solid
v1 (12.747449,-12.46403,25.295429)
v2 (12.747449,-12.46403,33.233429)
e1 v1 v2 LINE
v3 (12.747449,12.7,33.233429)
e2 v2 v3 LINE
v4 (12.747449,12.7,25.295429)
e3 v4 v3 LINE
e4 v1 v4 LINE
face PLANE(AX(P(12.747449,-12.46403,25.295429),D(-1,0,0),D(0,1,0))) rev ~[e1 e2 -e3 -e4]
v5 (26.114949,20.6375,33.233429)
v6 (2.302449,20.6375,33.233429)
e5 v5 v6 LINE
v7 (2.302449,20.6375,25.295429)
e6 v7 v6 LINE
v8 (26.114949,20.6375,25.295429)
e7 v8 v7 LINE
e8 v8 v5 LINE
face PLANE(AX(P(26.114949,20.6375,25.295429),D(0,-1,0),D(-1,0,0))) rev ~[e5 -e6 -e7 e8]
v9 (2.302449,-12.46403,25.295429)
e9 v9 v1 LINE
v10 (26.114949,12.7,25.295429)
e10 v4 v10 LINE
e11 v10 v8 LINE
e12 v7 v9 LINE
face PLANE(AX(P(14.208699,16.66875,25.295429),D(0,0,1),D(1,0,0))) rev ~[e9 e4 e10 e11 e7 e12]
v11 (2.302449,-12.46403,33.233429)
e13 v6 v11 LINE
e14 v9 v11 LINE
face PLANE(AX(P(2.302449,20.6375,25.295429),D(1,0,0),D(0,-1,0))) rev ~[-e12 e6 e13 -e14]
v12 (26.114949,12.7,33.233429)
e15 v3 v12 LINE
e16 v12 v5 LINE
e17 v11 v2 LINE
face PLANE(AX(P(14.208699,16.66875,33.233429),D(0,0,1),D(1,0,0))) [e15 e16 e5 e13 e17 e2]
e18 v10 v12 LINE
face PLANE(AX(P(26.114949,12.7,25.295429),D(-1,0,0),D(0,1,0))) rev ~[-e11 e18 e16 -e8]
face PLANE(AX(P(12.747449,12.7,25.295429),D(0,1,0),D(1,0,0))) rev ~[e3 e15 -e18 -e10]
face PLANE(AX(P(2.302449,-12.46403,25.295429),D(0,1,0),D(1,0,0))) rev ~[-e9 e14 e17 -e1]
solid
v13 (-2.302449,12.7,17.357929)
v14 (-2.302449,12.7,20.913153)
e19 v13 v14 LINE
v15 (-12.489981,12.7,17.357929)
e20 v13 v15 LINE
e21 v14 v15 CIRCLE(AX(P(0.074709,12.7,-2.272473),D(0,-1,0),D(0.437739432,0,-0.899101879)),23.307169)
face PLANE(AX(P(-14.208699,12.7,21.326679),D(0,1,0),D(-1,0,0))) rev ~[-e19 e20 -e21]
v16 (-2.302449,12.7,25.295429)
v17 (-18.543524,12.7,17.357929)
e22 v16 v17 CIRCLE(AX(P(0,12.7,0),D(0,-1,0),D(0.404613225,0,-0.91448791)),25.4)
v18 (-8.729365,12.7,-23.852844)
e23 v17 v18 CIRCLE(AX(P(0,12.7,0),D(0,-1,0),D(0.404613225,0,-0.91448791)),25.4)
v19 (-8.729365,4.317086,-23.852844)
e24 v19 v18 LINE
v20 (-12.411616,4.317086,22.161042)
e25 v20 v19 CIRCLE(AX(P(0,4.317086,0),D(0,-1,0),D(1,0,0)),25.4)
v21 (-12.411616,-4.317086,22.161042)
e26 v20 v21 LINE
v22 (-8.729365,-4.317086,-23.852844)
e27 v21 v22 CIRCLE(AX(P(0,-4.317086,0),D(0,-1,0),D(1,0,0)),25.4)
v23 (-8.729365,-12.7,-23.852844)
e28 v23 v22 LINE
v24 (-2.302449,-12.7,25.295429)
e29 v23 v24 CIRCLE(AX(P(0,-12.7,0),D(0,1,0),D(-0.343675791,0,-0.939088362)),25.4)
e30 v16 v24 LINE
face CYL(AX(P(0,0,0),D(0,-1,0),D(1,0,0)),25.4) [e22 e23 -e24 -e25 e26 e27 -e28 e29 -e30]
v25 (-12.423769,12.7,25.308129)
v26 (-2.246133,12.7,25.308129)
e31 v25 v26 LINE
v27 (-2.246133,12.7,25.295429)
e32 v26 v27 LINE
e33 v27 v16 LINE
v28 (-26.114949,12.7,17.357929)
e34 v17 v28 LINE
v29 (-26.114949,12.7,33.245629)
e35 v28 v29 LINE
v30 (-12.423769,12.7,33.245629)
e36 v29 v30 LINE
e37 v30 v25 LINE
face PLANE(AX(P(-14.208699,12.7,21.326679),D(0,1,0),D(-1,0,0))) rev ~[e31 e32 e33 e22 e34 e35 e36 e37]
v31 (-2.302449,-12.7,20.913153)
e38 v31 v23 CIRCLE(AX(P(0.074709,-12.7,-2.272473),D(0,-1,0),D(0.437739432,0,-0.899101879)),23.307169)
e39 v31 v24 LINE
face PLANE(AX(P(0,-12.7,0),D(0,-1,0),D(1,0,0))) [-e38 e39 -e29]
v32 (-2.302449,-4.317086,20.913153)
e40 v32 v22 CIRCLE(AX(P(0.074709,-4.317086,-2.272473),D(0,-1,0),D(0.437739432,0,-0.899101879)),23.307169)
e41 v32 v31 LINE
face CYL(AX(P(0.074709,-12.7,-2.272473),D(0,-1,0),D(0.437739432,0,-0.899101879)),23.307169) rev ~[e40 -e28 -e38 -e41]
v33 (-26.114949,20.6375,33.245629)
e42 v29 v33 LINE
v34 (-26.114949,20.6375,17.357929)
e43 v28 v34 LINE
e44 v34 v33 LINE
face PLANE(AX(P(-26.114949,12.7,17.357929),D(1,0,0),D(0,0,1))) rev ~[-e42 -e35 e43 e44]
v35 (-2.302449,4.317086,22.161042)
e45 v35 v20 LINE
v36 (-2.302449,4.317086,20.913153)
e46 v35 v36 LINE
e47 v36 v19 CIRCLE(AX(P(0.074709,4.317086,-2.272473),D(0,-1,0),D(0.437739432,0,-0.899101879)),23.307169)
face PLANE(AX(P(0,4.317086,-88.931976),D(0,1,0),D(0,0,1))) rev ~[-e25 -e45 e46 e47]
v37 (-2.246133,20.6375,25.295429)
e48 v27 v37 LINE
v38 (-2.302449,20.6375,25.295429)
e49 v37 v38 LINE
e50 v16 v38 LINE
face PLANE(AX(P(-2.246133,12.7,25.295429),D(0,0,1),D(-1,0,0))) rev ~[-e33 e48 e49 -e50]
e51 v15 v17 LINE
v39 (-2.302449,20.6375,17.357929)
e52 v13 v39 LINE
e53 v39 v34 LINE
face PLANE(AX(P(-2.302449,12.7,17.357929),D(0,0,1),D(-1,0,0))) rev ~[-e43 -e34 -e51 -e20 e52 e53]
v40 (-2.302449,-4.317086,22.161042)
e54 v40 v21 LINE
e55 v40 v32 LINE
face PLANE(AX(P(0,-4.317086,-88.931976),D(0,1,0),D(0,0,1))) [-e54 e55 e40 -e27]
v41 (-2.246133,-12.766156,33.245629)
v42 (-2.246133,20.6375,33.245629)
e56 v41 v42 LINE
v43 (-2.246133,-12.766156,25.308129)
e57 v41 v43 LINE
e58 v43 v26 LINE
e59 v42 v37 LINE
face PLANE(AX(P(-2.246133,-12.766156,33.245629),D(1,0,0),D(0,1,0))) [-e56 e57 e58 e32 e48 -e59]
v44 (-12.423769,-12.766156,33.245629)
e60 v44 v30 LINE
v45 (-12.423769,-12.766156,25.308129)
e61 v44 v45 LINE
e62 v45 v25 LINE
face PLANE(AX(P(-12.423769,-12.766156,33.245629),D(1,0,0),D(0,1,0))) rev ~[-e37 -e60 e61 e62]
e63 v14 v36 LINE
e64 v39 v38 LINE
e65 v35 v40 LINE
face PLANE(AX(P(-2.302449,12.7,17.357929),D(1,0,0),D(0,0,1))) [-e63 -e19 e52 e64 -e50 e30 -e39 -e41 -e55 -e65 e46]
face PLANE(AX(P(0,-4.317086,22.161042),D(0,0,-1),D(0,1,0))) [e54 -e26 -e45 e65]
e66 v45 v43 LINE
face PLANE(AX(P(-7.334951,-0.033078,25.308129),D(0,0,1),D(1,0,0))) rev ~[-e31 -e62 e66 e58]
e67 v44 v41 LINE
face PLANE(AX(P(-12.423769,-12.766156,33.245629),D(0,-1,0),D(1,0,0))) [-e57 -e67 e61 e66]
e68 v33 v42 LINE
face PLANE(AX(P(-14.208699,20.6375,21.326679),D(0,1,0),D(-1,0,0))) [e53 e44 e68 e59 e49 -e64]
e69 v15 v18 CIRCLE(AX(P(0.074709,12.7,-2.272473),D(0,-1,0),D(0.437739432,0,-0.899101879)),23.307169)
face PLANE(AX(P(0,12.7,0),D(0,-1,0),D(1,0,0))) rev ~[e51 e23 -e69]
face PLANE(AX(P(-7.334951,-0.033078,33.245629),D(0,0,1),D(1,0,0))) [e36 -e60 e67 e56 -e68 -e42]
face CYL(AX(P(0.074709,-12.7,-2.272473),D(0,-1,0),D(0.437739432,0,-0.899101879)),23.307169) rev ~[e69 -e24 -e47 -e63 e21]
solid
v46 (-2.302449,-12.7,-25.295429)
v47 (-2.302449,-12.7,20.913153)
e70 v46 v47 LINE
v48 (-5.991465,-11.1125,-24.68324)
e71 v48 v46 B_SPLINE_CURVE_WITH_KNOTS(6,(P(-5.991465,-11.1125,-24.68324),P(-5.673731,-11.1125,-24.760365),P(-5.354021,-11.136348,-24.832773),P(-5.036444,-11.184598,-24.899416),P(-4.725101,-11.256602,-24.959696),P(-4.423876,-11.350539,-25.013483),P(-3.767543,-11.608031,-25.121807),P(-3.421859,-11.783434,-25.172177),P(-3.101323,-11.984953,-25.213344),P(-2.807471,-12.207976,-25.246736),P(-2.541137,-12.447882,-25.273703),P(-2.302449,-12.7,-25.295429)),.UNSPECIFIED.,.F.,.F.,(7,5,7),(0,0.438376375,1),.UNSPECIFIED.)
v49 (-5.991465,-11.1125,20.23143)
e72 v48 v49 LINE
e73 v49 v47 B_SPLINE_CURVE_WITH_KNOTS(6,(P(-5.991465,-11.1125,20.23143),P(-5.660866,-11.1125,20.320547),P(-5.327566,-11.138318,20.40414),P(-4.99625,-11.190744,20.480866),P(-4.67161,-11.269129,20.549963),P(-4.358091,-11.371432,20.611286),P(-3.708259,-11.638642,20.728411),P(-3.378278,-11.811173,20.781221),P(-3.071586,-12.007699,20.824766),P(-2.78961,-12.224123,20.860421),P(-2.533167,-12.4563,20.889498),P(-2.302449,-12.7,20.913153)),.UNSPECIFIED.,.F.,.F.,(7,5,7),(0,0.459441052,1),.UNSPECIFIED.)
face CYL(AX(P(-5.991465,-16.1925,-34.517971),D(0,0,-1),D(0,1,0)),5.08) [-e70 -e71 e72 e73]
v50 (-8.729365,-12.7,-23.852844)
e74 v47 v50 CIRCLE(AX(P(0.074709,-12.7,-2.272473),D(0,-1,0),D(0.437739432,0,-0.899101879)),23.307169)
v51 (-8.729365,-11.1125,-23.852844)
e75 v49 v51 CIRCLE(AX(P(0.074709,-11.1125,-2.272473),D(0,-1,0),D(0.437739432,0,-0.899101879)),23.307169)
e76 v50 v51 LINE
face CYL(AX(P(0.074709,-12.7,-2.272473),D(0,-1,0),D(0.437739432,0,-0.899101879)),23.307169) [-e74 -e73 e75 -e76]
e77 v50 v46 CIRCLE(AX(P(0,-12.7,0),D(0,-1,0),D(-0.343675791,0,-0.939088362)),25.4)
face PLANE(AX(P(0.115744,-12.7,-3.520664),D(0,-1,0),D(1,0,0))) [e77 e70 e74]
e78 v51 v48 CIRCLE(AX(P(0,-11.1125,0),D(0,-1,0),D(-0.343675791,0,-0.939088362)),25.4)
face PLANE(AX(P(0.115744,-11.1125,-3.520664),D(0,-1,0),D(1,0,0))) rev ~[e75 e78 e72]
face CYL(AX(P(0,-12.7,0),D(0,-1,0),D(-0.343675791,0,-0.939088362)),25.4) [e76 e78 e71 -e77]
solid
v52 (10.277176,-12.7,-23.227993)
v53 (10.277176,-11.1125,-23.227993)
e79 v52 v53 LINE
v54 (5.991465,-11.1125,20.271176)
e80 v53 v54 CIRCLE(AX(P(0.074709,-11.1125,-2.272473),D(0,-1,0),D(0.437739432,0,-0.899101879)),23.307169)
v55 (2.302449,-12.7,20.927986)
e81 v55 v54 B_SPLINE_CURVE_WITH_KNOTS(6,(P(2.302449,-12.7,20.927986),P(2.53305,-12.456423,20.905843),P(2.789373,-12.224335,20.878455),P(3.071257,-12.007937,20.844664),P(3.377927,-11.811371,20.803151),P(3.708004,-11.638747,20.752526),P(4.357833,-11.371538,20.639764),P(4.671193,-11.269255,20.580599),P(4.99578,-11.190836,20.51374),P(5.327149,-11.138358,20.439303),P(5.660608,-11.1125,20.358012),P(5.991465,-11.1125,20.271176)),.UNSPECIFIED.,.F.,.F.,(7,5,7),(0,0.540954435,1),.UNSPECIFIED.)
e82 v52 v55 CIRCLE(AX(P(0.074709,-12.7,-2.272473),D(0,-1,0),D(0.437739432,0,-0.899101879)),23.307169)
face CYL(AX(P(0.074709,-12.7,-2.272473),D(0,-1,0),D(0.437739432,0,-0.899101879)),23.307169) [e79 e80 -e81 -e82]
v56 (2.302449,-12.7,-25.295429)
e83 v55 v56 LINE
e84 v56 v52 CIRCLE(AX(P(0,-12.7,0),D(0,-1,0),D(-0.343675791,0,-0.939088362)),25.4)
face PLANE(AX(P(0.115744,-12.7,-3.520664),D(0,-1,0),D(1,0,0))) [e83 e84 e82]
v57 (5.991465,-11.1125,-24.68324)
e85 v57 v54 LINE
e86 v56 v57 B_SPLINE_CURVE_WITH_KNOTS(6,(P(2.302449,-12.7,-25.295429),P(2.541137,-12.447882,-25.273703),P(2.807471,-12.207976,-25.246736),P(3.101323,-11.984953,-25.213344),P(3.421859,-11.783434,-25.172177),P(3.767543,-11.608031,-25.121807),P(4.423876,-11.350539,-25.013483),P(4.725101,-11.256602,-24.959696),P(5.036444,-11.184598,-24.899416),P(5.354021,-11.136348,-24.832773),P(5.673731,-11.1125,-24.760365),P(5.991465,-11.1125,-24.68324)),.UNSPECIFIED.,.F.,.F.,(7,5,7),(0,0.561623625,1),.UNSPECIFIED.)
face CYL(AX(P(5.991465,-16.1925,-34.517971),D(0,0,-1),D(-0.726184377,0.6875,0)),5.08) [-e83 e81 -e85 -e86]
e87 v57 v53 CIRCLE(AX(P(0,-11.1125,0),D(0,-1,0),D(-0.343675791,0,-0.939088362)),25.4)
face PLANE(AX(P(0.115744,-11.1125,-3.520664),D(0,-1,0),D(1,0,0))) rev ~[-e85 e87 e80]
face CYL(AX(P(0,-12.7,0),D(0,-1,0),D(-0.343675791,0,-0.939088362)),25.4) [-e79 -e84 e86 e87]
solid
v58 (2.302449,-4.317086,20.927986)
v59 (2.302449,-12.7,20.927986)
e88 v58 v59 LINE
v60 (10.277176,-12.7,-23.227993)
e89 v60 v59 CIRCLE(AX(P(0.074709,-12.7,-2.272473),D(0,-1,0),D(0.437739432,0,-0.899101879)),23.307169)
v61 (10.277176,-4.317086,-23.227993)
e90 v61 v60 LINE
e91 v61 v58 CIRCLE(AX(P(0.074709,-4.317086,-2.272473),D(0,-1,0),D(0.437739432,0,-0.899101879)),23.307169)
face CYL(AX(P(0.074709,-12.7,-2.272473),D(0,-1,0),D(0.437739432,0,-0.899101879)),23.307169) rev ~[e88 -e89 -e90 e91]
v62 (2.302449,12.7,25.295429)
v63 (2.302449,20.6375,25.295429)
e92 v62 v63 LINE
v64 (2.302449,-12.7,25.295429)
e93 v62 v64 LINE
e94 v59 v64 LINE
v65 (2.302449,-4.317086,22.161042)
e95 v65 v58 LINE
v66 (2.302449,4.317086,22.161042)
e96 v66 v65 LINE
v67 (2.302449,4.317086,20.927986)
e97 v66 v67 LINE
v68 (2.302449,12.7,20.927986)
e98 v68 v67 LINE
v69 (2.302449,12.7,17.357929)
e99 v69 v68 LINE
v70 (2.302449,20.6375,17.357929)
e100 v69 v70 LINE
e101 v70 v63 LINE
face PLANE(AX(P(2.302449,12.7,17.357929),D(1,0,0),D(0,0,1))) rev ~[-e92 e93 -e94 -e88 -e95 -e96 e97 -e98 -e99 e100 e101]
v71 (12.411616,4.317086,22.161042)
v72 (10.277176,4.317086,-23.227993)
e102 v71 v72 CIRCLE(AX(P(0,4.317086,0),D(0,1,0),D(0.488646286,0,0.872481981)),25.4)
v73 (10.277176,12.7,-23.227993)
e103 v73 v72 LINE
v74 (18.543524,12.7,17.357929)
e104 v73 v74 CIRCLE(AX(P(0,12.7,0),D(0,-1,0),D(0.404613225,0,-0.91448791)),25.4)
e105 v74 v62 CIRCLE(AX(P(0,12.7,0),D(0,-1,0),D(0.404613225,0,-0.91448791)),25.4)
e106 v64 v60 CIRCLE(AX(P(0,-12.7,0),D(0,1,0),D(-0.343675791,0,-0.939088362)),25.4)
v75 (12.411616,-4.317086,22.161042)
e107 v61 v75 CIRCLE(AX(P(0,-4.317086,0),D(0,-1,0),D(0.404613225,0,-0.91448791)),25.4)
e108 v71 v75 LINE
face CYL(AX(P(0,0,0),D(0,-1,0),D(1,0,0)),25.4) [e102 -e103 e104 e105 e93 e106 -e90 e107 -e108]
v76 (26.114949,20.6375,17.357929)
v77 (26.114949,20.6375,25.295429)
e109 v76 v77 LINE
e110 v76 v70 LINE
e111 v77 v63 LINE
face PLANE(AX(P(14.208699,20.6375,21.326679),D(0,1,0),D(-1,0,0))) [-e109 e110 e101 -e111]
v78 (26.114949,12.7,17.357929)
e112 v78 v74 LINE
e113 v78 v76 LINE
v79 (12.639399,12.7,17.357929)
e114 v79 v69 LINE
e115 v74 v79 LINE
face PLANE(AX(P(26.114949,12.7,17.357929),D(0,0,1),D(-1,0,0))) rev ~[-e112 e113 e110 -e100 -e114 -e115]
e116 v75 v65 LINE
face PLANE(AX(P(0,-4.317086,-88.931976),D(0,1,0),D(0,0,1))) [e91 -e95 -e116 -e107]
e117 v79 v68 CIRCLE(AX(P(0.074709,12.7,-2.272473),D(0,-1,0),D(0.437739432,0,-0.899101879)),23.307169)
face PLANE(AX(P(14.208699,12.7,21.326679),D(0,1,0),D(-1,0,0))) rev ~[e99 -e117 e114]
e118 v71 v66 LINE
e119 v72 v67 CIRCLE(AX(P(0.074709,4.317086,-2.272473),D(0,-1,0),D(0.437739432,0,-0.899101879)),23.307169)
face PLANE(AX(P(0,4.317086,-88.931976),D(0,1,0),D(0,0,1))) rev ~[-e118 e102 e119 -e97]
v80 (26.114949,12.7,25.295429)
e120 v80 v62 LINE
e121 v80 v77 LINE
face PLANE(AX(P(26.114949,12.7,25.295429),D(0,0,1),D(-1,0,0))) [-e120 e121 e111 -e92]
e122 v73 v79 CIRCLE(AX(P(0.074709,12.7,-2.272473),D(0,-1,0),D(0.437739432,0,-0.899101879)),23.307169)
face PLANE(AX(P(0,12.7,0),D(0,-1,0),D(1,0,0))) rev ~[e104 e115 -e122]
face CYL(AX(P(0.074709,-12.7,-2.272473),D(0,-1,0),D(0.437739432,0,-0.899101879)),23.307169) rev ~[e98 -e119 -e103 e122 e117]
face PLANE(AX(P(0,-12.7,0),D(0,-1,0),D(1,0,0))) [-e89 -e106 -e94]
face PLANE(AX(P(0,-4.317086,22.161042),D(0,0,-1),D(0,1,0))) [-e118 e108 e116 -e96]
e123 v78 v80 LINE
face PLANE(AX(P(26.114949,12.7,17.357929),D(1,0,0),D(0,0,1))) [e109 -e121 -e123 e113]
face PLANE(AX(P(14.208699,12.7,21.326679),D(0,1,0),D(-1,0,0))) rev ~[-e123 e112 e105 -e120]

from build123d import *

# Parameters (mm, degrees)
F0_R            = 25.4
F1_DEPTH        = 12.7
F2_W            = 8.63417238
F2_H            = 111.093018204
F3_DEPTH        = 38.1
F5_DEPTH        = 38.1
F6_W            = 4.6048974618
F6_H            = 114.5466864109
F7_DEPTH        = 38.1
F8_DEPTH        = 1.5875
F9_DEPTH        = 76.2
F10_DEPTH       = 25.4
F11_T1_DEPTH    = 64.6536648527
F11_S1_T1_DEPTH = 64.6684980489
F12_W           = 23.8125
F12_H           = 7.9375
F13_DEPTH       = 7.9375
F14_W           = 23.8125
F14_H           = 7.9375
F15_DEPTH       = 7.9375
F16_W           = 10.1776355878
F16_H           = 25.4661563456
F17_DEPTH       = 7.9375
F20_W           = 10.445
F20_H           = 25.1640297145
F21_DEPTH       = 7.938


# Not quite as in the source:
# - a fillet or chamfer that OpenCascade refuses, or shapes differently, is made with other operations: its cross-section is extruded or revolved along the edge and cut away or added


with BuildPart() as f1:
    # F0 (on Front) → F1 (new body, symmetric)
    with BuildSketch(Plane.XZ):
        Circle(F0_R)
    extrude(amount=F1_DEPTH, both=True)

    # F2 (on Right) → F3 (cut, symmetric)
    with BuildSketch(Plane.YZ):
        with Locations((0, -33.3854667842)):
            Rectangle(F2_W, F2_H)
    extrude(amount=F3_DEPTH, both=True, mode=Mode.SUBTRACT)

    # F4 (on face) → F5 (cut, symmetric)
    with BuildSketch(Plane.XZ.offset(12.7)):
        with BuildLine():
            ThreePointArc((-8.7293650817, -23.8528443853), (0.834589374, -25.3862848912), (10.2771759058, -23.2279929267))
            ThreePointArc((10.2771759058, -23.2279929267), (-0.6911145239, 21.0221106841), (-8.7293650817, -23.8528443853))
        make_face()
    extrude(amount=F5_DEPTH, both=True, mode=Mode.SUBTRACT)

    # F6 (on Top) → F7 (cut, symmetric)
    with BuildSketch(Plane.XY):
        with Locations((0, -20.7220129669)):
            Rectangle(F6_W, F6_H)
    extrude(amount=F7_DEPTH, both=True, mode=Mode.SUBTRACT)

    # F12 (on face) → F13 (join)
    with BuildSketch(Plane(origin=(0, 12.7, 0), x_dir=(-1, 0, 0), z_dir=(0, 1, 0))):
        with Locations((-14.2086987309, 21.3266790306)):
            Rectangle(F12_W, F12_H)
    extrude(amount=F13_DEPTH)

    # F14 (on face) → F15 (join)
    with BuildSketch(Plane(origin=(0, 12.7, 0), x_dir=(-1, 0, 0), z_dir=(0, 1, 0))):
        with Locations((14.2086987309, 21.3266790306)):
            Rectangle(F14_W, F14_H)
        Polygon((2.2461330518, 25.2954290306), (2.3024487309, 25.2954290306), (26.1149487309, 25.2954290306), (26.1149487309, 33.2456290306), (2.2461330518, 33.2456290306), align=None)
    extrude(amount=F15_DEPTH)

    # F16 (on face) → F17 (join)
    with BuildSketch(Plane.XY.offset(33.2456290306)):
        with Locations((-7.3349508457, -0.0330781728)):
            Rectangle(F16_W, F16_H)
    extrude(amount=-F17_DEPTH)


with BuildPart() as f8:
    # F4 (on face) → F8 (new body)
    with BuildSketch(Plane.XZ.offset(12.7)):
        with BuildLine():
            ThreePointArc((-8.7293650817, -23.8528443853), (0.834589374, -25.3862848912), (10.2771759058, -23.2279929267))
            ThreePointArc((10.2771759058, -23.2279929267), (-0.6911145239, 21.0221106841), (-8.7293650817, -23.8528443853))
        make_face()
    extrude(amount=-F8_DEPTH)

    # F6 (on Top) → F9 (cut)
    with BuildSketch(Plane.XY):
        with Locations((0, -20.7220129669)):
            Rectangle(F6_W, F6_H)
    extrude(amount=-F9_DEPTH, mode=Mode.SUBTRACT)

    # F6 (on Top) → F10 (cut, symmetric)
    with BuildSketch(Plane.XY):
        with Locations((0, -20.7220129669)):
            Rectangle(F6_W, F6_H)
    extrude(amount=F10_DEPTH, both=True, mode=Mode.SUBTRACT)

    # F11: fillet of radius 5.08 on 1 edges, made by hand

    # F11_s2 → F11_t1 (cut)
    with BuildSketch(Plane.XY.offset(-34.5179706237)):
        with BuildLine():
            ThreePointArc((-5.9914653682, -11.1125), (-3.983419054, -11.52622204), (-2.3024487309, -12.7))
            Line((-2.3024487309, -12.7), (-2.3024487309, -11.1125))
            Line((-2.3024487309, -11.1125), (-5.9914653682, -11.1125))
        make_face()
    extrude(amount=F11_T1_DEPTH, mode=Mode.SUBTRACT)

    # F11#s1: fillet of radius 5.08 on 1 edges, made by hand

    # F11_s1_s2 → F11_s1_t1 (cut)
    with BuildSketch(Plane.XY.offset(-34.5179706237)):
        with BuildLine():
            ThreePointArc((2.3024487309, -12.7), (3.983419054, -11.52622204), (5.9914653682, -11.1125))
            Line((5.9914653682, -11.1125), (2.3024487309, -11.1125))
            Line((2.3024487309, -11.1125), (2.3024487309, -12.7))
        make_face()
    extrude(amount=F11_S1_T1_DEPTH, mode=Mode.SUBTRACT)


with BuildPart() as f21:
    # F20 (on face) → F21 (new body)
    with BuildSketch(Plane.XY.offset(25.2954290306)):
        Polygon((26.1149487309, 20.6375), (2.3024487309, 20.6375), (2.3024487309, 12.7), (12.7474487309, 12.7), (26.1149487309, 12.7), align=None)
        with Locations((7.5249487309, 0.1179851428)):
            Rectangle(F20_W, F20_H)
    extrude(amount=F21_DEPTH)


solid = Compound([f1.part, f8.part, f21.part])
